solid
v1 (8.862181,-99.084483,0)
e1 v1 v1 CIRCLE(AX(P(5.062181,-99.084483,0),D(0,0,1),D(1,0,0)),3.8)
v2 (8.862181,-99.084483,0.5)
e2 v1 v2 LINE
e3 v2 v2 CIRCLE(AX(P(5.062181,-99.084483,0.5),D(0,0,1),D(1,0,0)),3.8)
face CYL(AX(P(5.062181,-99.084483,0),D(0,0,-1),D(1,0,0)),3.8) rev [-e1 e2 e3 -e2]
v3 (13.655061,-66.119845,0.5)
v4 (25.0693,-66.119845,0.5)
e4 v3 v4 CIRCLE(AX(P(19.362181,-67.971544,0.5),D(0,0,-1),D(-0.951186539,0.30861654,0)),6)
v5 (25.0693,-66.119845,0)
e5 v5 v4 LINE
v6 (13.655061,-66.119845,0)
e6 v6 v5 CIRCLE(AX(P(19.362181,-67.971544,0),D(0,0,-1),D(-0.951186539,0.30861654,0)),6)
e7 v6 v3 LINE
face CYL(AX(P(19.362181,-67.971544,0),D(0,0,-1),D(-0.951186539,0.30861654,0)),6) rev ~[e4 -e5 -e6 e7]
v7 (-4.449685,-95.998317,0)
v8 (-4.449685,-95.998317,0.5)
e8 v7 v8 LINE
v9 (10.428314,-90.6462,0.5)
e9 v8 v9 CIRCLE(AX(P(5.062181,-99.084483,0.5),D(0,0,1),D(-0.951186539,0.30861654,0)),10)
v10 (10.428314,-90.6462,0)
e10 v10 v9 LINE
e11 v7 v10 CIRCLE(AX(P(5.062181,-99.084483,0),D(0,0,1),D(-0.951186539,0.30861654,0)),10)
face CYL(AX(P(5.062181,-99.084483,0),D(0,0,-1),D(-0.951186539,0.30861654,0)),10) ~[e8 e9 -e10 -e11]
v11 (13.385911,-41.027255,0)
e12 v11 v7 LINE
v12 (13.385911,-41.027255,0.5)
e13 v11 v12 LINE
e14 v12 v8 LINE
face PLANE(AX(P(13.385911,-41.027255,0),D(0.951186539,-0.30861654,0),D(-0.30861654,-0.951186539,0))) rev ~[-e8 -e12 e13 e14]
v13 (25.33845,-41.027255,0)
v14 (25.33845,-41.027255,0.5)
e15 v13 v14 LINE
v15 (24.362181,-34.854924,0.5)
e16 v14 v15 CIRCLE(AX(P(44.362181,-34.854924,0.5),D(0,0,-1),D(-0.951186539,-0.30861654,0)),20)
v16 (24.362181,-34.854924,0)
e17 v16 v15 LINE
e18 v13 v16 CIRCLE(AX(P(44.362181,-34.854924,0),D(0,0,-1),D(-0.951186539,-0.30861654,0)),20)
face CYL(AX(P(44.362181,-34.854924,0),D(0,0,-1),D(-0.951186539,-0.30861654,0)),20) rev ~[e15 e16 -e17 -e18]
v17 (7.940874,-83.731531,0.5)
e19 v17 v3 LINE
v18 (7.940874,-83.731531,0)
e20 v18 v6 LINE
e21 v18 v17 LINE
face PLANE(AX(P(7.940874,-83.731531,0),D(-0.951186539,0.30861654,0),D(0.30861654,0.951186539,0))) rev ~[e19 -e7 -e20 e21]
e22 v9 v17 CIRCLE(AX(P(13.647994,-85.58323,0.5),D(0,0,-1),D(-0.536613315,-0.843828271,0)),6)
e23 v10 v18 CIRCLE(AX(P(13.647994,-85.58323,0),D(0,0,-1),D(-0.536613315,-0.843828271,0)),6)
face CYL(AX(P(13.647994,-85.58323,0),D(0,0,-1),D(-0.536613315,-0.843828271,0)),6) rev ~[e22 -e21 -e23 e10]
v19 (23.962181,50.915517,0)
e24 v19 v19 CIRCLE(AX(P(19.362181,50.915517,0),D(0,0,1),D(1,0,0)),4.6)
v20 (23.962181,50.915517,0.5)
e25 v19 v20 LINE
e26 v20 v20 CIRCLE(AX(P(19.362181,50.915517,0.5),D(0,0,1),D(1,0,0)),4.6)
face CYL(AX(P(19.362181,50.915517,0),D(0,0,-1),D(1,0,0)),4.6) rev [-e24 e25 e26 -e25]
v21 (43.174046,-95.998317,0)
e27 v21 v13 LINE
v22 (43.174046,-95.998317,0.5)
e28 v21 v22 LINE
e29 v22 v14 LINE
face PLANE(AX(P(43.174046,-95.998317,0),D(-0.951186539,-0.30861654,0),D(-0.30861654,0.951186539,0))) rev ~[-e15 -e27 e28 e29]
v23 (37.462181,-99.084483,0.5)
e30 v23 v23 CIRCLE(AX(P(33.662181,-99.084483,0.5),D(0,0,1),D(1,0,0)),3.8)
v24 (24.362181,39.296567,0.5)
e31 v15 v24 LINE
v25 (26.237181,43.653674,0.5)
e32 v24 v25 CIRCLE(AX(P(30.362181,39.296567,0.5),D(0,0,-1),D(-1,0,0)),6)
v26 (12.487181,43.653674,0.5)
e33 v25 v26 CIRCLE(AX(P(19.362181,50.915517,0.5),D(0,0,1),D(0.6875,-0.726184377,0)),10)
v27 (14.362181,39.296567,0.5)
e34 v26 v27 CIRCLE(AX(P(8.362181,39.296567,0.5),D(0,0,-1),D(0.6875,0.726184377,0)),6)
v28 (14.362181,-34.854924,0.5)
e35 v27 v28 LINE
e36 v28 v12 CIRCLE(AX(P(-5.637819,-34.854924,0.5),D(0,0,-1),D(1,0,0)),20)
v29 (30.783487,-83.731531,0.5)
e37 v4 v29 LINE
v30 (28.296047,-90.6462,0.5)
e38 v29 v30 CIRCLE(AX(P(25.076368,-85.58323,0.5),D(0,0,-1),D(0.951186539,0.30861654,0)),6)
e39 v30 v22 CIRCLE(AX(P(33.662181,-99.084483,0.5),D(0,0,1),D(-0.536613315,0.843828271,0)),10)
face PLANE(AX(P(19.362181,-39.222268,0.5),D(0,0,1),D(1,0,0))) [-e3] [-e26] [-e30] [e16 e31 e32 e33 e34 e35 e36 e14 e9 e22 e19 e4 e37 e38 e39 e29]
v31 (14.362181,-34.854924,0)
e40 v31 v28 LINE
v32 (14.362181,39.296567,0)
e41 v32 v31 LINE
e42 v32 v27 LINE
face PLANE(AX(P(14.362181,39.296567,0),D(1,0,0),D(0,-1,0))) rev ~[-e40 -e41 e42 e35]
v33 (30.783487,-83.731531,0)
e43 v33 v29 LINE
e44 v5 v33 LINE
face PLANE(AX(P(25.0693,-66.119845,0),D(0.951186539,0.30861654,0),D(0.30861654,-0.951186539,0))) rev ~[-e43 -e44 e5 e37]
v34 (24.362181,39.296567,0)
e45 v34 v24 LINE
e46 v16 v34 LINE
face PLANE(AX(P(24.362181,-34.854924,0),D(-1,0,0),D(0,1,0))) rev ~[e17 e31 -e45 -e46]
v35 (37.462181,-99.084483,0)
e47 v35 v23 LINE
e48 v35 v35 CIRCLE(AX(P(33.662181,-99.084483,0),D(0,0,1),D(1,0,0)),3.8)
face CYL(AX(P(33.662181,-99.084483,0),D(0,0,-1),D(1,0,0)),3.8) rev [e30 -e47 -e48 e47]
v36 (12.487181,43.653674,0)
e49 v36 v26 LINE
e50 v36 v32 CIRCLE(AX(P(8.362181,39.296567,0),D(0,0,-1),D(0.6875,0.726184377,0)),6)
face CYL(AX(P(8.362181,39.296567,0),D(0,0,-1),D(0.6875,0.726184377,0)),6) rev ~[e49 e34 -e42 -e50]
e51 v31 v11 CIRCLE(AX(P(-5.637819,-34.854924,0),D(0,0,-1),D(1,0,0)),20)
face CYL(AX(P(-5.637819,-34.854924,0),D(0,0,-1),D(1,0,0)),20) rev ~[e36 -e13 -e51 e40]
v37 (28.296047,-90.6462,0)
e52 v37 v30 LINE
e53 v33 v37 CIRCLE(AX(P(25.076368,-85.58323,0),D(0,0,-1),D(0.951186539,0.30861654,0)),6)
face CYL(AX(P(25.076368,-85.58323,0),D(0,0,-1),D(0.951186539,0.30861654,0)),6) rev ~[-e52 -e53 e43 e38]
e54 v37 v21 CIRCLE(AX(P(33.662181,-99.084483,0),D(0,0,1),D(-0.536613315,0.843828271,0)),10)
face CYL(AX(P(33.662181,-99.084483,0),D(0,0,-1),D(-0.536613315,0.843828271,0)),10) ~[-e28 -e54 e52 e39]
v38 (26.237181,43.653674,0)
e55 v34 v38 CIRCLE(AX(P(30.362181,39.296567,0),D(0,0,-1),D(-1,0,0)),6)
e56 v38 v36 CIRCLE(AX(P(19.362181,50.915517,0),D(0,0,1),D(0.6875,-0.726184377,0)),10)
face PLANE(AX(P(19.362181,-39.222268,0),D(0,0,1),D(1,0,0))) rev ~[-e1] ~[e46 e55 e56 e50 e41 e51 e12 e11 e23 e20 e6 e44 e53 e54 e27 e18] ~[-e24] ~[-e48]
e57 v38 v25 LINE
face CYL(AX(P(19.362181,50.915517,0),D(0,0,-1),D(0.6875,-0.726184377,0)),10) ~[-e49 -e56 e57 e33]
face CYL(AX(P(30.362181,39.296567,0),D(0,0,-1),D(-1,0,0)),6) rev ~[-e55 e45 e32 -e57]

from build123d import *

# Parameters (mm, degrees)
F0_R     = 3.8
F0_R_2   = 4.6
F1_DEPTH = 0.5


# Not quite as in the source:
# - a feature names something its author has since deleted; it is built from what else it names


with BuildPart() as f1:
    # F0 (on Top) → F1 (new body)
    with BuildSketch(Plane.XY):
        with BuildLine():
            ThreePointArc((24.3621806055, 39.2965673213), (24.8508286843, 41.6682755665), (26.2371806055, 43.6536735858))
            ThreePointArc((26.2371806055, 43.6536735858), (19.3621806055, 60.91551736), (12.4871806055, 43.6536735858))
            ThreePointArc((12.4871806055, 43.6536735858), (13.8735325268, 41.6682755665), (14.3621806055, 39.2965673213))
            Line((14.3621806055, 39.2965673213), (14.3621806055, -34.8549244096))
            ThreePointArc((14.3621806055, -34.8549244096), (14.1166056215, -37.9794551404), (13.3859113767, -41.0272552129))
            Line((13.3859113767, -41.0272552129), (-4.4496847801, -95.9983172384))
            ThreePointArc((-4.4496847801, -95.9983172384), (8.4471568034, -108.4941551178), (10.428313753, -90.646199933))
            ThreePointArc((10.428313753, -90.646199933), (8.0021901548, -87.6142160275), (7.9408744101, -83.7315310678))
            Line((7.9408744101, -83.7315310678), (13.6550613742, -66.1198446814))
            ThreePointArc((13.6550613742, -66.1198446814), (19.3621806055, -61.9715439224), (25.0692998369, -66.1198446814))
            Line((25.0692998369, -66.1198446814), (30.783486801, -83.7315310678))
            ThreePointArc((30.783486801, -83.7315310678), (30.7221710563, -87.6142160275), (28.2960474581, -90.646199933))
            ThreePointArc((28.2960474581, -90.646199933), (30.2772044076, -108.4941551178), (43.1740459911, -95.9983172384))
            Line((43.1740459911, -95.9983172384), (25.3384498343, -41.0272552129))
            ThreePointArc((25.3384498343, -41.0272552129), (24.6077555896, -37.9794551404), (24.3621806055, -34.8549244096))
            Line((24.3621806055, -34.8549244096), (24.3621806055, 39.2965673213))
        make_face()
        with Locations((5.0621806055, -99.08448264)):
            Circle(F0_R, mode=Mode.SUBTRACT)
        with Locations((33.6621806055, -99.08448264)):
            Circle(F0_R, mode=Mode.SUBTRACT)
        with Locations((19.3621806055, 50.91551736)):
            Circle(F0_R_2, mode=Mode.SUBTRACT)
    extrude(amount=F1_DEPTH)


solid = f1.part
